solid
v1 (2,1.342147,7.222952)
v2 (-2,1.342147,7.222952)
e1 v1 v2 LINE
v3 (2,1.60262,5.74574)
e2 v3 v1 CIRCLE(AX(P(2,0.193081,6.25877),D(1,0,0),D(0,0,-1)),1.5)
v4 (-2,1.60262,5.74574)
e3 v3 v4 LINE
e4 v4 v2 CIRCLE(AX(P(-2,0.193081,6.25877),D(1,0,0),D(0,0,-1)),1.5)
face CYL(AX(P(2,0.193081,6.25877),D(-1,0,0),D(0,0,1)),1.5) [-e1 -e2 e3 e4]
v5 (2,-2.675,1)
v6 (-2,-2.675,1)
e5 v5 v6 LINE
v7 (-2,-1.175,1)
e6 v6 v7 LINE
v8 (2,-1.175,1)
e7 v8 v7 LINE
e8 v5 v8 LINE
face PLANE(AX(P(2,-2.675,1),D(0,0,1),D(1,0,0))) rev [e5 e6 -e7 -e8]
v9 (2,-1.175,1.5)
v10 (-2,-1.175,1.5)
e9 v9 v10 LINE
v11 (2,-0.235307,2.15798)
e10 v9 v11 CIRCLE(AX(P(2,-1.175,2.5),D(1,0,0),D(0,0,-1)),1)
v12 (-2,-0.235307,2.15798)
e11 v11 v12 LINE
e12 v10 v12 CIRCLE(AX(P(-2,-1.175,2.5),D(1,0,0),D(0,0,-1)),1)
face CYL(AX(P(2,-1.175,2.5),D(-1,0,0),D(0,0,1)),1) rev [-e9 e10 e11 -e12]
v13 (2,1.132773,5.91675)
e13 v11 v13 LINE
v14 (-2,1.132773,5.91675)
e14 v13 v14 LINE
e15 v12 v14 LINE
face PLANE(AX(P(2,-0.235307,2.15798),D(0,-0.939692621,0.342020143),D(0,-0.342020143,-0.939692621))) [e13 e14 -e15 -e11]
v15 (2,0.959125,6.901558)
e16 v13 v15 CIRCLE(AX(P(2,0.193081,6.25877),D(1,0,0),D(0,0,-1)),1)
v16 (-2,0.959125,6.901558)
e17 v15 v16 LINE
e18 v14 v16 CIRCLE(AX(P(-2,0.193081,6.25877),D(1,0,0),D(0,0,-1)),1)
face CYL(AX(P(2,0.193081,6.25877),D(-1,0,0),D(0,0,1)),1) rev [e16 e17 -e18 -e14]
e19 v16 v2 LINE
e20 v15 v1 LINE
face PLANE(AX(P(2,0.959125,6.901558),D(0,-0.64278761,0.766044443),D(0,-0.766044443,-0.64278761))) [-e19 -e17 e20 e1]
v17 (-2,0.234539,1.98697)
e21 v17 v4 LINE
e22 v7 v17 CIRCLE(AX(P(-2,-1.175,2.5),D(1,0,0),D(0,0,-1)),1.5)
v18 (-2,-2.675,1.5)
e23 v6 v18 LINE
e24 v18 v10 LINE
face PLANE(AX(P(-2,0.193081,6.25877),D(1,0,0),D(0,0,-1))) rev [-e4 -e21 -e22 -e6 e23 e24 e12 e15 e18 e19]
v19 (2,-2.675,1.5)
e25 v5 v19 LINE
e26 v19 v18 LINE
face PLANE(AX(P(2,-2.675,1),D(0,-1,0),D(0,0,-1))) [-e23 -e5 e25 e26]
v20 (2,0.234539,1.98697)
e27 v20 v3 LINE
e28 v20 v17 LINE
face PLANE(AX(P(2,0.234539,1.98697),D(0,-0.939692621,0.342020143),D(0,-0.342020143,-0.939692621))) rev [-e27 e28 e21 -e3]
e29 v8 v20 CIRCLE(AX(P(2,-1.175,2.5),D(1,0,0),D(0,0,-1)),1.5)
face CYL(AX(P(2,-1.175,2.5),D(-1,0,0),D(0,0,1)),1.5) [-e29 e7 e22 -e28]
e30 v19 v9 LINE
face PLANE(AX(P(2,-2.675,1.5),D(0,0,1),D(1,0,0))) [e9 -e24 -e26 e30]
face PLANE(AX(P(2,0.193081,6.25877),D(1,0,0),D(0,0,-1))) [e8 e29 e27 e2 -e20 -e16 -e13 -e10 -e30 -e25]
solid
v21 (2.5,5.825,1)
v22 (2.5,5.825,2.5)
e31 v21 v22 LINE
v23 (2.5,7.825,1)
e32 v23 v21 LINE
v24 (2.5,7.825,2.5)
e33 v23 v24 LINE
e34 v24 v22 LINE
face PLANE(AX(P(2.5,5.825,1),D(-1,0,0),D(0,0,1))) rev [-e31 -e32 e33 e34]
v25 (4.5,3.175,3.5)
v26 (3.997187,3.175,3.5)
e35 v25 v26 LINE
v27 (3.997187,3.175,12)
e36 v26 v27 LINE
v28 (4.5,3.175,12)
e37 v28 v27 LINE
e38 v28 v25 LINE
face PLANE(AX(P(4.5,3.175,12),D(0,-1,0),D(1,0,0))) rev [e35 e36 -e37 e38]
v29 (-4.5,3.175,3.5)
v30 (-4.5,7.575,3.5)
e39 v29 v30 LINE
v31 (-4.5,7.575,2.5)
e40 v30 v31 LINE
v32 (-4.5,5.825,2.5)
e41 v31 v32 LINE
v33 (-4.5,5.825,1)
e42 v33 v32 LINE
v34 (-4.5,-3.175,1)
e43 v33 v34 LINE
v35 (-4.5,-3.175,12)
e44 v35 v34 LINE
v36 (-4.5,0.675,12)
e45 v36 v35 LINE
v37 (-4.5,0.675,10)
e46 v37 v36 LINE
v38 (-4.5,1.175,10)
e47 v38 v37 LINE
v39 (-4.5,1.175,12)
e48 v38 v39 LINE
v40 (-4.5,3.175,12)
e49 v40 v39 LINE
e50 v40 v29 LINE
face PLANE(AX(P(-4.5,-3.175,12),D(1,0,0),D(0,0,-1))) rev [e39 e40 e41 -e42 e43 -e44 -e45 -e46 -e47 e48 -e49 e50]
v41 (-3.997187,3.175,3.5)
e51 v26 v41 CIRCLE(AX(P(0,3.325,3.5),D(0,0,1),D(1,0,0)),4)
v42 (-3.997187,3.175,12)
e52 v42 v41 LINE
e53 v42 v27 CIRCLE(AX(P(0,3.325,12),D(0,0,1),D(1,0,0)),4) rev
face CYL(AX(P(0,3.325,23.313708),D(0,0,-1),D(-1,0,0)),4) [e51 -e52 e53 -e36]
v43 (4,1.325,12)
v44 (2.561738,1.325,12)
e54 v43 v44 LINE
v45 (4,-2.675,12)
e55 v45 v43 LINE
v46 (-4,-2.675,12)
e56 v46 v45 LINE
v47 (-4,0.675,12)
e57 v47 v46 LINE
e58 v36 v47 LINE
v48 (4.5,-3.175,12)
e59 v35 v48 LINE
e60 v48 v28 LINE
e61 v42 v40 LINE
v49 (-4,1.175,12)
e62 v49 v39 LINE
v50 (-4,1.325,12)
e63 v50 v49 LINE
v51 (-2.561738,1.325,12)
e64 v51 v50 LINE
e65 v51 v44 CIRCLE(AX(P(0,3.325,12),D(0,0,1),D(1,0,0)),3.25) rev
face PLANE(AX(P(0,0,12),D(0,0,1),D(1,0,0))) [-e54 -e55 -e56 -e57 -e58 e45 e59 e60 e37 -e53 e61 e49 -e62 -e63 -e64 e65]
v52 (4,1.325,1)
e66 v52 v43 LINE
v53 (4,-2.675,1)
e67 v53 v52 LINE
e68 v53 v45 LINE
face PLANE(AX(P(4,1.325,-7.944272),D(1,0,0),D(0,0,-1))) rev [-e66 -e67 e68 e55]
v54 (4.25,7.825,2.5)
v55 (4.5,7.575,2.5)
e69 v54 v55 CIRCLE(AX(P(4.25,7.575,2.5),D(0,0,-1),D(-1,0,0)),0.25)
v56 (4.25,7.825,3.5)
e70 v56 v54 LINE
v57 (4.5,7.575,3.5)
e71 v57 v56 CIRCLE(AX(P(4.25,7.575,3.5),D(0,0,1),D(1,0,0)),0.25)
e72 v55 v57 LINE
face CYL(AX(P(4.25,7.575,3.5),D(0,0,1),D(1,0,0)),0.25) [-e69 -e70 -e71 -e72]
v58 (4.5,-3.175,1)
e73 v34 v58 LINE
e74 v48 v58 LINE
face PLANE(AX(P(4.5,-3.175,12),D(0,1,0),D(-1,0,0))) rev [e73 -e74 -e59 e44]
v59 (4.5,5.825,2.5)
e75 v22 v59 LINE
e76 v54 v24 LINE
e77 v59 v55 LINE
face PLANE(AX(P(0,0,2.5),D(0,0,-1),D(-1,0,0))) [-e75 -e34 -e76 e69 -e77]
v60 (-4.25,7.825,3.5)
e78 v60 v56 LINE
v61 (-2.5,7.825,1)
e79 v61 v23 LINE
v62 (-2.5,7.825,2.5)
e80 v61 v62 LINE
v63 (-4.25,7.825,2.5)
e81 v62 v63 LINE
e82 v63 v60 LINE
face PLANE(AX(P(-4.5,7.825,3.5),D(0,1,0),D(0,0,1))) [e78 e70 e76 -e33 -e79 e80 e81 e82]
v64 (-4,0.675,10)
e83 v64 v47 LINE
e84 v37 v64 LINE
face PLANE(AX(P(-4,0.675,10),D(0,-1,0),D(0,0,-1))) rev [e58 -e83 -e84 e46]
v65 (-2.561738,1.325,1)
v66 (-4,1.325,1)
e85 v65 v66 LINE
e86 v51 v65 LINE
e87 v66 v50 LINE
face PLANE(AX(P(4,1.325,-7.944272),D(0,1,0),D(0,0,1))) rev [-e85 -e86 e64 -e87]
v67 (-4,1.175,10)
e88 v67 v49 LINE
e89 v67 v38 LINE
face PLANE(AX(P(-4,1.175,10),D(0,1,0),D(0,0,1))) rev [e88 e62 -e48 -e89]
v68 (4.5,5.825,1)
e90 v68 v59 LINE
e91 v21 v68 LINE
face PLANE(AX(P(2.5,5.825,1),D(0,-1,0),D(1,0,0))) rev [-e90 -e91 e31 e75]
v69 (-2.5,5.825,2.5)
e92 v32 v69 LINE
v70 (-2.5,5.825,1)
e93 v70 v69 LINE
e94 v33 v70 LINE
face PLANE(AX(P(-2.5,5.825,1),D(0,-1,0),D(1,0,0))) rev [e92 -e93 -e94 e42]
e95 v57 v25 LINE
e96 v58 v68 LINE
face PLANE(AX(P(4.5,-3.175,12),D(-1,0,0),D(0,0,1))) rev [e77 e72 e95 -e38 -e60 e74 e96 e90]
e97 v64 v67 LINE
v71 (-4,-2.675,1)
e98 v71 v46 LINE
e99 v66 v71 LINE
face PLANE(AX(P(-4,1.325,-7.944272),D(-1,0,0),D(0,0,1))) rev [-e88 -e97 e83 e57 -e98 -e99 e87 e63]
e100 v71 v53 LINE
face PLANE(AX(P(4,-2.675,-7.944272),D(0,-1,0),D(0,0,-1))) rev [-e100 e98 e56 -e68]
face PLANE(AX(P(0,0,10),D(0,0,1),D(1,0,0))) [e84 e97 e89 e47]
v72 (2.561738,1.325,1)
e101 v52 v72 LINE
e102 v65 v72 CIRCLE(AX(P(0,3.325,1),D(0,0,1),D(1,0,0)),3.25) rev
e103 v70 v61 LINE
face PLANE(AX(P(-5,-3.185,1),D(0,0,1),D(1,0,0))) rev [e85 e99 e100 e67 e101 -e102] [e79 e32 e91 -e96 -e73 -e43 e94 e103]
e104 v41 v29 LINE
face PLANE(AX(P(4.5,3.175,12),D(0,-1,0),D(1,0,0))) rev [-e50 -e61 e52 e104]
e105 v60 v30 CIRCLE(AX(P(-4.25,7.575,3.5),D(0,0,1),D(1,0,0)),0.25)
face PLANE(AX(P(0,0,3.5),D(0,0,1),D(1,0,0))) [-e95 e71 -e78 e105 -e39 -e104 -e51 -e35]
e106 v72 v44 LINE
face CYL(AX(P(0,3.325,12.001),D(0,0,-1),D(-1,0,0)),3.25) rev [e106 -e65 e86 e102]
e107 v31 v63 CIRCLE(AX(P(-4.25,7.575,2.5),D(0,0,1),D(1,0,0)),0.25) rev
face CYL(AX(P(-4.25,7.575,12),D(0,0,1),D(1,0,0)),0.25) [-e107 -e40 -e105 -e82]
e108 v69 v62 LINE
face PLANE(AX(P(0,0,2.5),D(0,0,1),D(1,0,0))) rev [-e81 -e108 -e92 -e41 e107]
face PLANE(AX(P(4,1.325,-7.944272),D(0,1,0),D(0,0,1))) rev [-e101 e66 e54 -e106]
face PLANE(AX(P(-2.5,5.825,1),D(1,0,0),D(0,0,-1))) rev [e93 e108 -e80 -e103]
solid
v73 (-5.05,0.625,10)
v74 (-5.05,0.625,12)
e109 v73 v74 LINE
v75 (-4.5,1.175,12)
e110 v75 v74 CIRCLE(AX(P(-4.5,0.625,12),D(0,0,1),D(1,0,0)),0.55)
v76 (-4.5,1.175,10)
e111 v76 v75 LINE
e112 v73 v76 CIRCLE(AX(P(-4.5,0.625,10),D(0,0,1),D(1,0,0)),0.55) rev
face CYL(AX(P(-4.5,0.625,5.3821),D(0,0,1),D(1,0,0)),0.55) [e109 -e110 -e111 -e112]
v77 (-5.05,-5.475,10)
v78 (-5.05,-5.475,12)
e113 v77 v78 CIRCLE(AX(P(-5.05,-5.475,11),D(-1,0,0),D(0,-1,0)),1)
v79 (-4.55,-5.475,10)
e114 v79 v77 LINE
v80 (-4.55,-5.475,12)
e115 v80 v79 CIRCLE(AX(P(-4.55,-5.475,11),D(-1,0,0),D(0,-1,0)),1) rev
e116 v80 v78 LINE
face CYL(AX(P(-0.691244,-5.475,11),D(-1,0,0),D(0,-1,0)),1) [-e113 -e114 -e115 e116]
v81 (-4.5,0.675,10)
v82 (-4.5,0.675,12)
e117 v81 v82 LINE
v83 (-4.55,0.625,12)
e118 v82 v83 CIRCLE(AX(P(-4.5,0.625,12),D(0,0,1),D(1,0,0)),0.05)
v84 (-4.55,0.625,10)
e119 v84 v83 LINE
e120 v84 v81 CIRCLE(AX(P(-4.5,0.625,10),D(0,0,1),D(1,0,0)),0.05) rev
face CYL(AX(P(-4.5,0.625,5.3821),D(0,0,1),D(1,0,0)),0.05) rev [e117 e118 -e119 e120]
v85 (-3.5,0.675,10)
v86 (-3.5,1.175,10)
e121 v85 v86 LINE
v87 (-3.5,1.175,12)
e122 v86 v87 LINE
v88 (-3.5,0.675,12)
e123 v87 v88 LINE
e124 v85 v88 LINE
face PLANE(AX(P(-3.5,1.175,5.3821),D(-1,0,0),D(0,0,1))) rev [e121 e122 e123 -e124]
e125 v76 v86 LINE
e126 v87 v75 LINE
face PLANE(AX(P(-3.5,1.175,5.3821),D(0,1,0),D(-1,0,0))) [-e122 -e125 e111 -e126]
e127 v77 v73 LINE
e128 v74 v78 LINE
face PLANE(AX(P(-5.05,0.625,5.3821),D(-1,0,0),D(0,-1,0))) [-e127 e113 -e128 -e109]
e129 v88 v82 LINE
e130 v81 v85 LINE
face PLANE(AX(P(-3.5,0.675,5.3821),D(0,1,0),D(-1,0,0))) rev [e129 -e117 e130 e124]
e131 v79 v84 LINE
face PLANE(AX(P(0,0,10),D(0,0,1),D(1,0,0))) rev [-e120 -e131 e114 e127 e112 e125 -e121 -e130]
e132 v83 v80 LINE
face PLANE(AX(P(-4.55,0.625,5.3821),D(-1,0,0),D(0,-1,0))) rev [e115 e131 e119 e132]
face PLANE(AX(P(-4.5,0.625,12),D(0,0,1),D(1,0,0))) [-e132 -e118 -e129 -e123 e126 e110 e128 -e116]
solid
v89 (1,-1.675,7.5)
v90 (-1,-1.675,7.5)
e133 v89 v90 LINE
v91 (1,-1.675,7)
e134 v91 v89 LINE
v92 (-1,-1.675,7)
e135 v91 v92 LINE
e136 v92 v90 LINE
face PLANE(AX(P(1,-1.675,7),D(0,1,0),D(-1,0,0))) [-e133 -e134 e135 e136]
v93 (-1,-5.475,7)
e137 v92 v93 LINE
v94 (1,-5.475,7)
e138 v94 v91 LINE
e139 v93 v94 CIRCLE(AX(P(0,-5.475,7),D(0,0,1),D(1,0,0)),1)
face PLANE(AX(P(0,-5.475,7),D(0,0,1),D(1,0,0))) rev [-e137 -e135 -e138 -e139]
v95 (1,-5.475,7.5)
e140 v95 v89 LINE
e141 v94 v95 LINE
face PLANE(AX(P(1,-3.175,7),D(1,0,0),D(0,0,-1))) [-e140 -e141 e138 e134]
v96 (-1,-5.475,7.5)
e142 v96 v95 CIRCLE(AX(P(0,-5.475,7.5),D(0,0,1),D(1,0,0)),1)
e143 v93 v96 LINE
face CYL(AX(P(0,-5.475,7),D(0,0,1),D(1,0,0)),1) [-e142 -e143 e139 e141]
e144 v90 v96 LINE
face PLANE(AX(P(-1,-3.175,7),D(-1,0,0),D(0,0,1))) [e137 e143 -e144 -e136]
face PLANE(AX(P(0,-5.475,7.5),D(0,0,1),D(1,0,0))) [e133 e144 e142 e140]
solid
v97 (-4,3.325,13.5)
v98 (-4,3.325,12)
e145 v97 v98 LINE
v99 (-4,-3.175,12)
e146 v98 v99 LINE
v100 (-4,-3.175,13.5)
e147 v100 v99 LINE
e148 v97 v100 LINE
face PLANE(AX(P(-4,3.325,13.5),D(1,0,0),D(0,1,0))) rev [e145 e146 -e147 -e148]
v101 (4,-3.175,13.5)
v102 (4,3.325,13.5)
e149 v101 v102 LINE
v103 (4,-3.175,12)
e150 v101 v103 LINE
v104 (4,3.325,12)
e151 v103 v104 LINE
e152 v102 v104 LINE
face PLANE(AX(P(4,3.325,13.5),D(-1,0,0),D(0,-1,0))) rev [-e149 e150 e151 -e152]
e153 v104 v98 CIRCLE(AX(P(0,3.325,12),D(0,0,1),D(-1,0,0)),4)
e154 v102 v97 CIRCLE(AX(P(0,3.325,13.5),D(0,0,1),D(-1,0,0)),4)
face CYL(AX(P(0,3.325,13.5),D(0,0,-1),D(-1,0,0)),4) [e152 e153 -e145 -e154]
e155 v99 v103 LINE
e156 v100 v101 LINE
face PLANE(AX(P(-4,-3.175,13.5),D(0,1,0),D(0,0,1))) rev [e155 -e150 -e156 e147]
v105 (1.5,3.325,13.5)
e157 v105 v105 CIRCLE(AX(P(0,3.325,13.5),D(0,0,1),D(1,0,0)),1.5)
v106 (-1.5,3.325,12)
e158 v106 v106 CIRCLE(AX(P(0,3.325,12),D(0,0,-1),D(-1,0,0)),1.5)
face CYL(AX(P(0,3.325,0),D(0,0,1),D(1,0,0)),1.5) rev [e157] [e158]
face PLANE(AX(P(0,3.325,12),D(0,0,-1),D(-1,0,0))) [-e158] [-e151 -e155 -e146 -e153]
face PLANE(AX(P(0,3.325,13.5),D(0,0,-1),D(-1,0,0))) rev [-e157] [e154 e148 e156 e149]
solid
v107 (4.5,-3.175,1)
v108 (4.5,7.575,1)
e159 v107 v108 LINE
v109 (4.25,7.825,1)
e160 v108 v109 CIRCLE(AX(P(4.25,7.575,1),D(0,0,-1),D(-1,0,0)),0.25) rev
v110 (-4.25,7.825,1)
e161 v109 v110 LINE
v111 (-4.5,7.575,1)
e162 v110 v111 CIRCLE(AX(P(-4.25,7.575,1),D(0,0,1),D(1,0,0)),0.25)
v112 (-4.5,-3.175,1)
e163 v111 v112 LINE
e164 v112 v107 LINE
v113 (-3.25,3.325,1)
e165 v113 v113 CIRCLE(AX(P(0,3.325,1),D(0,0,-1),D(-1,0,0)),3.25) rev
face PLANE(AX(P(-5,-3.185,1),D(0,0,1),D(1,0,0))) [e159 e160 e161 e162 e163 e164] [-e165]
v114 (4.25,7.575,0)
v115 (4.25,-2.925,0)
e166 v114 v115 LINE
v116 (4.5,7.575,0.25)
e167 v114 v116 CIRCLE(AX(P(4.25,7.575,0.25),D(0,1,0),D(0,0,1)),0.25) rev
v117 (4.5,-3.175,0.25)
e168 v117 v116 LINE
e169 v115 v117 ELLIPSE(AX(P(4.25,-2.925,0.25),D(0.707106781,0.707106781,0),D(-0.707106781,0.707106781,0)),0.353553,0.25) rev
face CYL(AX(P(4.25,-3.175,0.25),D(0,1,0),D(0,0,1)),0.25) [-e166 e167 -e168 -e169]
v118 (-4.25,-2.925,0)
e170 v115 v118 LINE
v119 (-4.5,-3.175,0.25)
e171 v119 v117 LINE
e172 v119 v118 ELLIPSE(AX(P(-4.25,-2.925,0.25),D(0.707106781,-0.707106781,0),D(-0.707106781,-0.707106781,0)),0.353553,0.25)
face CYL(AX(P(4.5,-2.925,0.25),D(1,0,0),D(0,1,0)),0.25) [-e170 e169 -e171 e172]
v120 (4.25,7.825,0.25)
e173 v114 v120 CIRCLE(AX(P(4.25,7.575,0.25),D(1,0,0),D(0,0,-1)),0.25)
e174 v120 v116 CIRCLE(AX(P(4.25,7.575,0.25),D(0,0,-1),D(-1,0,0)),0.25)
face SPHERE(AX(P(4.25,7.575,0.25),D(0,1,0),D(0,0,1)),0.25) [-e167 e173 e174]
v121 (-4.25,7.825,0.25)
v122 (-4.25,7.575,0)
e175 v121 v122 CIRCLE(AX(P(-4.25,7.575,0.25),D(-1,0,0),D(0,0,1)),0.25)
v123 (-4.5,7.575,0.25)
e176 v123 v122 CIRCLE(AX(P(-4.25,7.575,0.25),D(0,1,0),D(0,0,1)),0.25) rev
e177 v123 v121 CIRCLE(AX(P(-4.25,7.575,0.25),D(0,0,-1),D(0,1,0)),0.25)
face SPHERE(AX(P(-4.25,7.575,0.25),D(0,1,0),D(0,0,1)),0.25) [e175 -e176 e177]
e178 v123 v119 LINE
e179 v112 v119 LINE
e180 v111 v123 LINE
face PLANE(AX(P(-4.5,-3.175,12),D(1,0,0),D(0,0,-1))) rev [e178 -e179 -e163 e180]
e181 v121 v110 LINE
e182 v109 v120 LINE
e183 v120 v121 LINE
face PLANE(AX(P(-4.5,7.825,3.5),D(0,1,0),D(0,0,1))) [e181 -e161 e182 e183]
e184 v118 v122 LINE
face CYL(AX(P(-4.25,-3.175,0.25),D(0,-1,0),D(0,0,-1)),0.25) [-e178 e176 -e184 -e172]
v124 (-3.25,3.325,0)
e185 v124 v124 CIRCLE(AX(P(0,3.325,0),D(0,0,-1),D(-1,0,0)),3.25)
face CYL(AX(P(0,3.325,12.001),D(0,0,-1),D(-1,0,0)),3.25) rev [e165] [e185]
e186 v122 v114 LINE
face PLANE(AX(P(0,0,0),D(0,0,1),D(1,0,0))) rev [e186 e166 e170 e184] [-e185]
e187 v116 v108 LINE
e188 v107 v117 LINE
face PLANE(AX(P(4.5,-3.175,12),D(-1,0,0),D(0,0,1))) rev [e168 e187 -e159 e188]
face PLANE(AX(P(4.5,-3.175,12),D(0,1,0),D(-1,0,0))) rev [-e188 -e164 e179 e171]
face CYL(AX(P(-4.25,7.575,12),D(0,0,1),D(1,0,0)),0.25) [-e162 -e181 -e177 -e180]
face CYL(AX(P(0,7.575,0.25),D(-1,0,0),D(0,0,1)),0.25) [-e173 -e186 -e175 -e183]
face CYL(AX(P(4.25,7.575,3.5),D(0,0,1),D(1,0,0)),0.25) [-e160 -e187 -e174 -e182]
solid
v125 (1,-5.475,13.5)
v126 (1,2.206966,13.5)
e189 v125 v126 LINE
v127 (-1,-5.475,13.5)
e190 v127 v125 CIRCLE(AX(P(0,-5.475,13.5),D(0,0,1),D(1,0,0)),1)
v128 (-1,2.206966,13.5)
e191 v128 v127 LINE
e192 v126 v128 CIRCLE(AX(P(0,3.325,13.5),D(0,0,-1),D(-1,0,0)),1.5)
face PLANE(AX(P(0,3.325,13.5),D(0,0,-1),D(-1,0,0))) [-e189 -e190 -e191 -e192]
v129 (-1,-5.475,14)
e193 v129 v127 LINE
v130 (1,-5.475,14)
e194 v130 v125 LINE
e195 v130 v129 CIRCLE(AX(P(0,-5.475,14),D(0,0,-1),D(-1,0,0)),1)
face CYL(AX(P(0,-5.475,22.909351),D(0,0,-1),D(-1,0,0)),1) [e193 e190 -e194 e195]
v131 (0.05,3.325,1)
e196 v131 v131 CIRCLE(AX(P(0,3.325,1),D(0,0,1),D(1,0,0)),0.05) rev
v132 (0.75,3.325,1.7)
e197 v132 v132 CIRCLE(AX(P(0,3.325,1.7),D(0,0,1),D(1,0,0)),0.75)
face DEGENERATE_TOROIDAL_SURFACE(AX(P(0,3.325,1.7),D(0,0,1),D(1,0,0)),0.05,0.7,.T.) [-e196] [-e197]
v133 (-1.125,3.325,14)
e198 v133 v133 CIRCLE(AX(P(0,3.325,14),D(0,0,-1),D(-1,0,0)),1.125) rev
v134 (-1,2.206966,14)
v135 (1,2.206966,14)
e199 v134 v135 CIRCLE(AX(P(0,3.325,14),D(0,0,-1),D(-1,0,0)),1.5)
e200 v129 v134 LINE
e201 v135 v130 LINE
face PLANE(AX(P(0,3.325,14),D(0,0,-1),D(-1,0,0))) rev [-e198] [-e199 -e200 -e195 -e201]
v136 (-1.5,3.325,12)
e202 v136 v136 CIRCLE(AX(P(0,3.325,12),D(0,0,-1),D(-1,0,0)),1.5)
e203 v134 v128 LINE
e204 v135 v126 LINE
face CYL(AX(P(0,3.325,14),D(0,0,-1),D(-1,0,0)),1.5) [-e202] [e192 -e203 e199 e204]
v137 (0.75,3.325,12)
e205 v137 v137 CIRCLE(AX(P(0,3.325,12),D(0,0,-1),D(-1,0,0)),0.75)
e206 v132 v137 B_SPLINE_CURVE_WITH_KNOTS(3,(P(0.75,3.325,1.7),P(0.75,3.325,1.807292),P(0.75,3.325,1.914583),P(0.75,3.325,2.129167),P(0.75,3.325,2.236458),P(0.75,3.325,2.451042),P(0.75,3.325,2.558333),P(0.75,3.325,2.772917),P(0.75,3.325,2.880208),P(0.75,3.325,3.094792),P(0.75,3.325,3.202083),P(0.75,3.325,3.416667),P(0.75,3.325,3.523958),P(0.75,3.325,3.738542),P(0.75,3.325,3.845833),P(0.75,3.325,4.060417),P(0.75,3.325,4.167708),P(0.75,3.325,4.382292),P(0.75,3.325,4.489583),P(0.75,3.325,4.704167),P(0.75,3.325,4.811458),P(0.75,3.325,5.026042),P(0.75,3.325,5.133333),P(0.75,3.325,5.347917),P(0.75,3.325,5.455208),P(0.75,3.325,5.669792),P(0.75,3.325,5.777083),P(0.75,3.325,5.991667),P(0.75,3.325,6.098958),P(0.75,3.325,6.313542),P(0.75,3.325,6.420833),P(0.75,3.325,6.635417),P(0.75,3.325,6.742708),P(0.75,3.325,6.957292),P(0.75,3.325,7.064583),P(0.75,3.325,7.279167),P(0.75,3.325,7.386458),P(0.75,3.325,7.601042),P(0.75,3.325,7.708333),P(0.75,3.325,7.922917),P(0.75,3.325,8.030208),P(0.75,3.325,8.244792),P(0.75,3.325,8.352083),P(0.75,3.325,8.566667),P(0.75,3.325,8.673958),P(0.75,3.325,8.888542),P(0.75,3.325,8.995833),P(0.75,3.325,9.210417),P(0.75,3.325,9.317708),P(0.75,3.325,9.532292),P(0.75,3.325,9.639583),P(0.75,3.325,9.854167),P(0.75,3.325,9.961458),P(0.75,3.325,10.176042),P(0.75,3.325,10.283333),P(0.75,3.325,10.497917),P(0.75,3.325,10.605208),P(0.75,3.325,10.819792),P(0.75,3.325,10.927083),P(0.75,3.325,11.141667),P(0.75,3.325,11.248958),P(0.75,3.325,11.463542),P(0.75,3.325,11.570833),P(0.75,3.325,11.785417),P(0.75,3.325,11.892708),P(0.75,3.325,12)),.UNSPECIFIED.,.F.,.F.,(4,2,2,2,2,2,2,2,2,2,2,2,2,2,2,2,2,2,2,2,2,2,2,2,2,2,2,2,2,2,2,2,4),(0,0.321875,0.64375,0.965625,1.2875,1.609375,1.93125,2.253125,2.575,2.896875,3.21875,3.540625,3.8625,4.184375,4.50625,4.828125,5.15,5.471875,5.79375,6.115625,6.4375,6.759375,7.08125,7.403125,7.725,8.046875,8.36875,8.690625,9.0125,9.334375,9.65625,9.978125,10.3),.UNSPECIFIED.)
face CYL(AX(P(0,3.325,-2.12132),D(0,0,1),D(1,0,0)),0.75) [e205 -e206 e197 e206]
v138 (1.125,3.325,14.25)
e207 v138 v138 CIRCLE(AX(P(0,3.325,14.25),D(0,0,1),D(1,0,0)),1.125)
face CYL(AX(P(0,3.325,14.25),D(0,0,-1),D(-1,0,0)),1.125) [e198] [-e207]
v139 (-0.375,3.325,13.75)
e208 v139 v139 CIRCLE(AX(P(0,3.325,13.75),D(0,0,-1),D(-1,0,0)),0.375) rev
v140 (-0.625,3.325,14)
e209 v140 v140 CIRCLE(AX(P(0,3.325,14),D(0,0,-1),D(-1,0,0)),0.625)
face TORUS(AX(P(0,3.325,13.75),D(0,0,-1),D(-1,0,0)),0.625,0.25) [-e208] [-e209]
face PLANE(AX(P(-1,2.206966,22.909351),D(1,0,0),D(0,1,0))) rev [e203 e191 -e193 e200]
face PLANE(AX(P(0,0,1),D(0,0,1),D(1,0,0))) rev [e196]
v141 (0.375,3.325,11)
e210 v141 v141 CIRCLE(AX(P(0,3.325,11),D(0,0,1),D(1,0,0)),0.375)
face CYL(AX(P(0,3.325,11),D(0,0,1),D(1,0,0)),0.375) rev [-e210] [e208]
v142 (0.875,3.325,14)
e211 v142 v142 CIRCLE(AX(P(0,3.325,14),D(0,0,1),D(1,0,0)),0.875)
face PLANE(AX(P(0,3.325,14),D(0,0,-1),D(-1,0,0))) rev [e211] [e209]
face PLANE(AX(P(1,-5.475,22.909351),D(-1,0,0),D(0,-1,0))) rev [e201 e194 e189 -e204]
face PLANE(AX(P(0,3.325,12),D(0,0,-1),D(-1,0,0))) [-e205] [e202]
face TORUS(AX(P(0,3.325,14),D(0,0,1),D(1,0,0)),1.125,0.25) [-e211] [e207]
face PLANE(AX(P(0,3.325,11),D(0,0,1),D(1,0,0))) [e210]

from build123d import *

# Parameters (mm, degrees)
SKETCH1_W              = 9
SKETCH1_H              = 6.35
BOSS_EXTRUDE1_DEPTH    = 12
SKETCH2_W              = 9
SKETCH2_H              = 11
BOSS_EXTRUDE2_DEPTH    = 3.5
SKETCH4_R              = 4
BOSS_EXTRUDE3_DEPTH    = 12
SKETCH5_W              = 2
SKETCH5_H              = 2
CUT_EXTRUDE1_DEPTH     = 0.75
FILLET1_R              = 0.25
CUT_EXTRUDE2_REACH     = 17.016
SKETCH6_R              = 3.25
SKETCH7_W              = 8
SKETCH7_H              = 4
CUT_EXTRUDE3_DEPTH     = 11
BOSS_EXTRUDE5_DEPTH    = 1.5
SPLIT1_SURFACE_1_BACK  = 20.602
SPLIT1_SURFACE_1_DEPTH = 41.204
SPLIT1_SURFACE_2_BACK  = 20.602
SPLIT1_SURFACE_2_DEPTH = 41.204
SKETCH10_R             = 1.5
CUT_EXTRUDE4_DEPTH     = 17.239785251
SKETCH11_R             = 1.5
BOSS_EXTRUDE6_DEPTH    = 2
SKETCH12_R             = 0.75
BOSS_EXTRUDE7_DEPTH    = 11
FILLET2_R              = 0.7
BOSS_EXTRUDE8_DEPTH    = 0.5
SKETCH14_W             = 0.5
SKETCH14_H             = 0.5
CUT_EXTRUDE5_DEPTH     = 2
EXTRUDE_THIN1_DEPTH    = 2
BOSS_EXTRUDE9_DEPTH    = 0.5
BOSS_EXTRUDE10_DEPTH   = 0.5
EXTRUDE_THIN2_DEPTH    = 2
SKETCH21_R             = 1.125
SKETCH21_R_2           = 0.875
EXTRUDE_THIN3_DEPTH    = 0.25
SKETCH22_R             = 0.375
CUT_EXTRUDE6_DEPTH     = 3
FILLET3_R              = 0.25


with BuildPart() as part:
    # Sketch1 → Boss-Extrude1 (new body)
    with BuildSketch(Plane.XY):
        Rectangle(SKETCH1_W, SKETCH1_H)
    extrude(amount=BOSS_EXTRUDE1_DEPTH)

    # Sketch2 → Boss-Extrude2 (add)
    with BuildSketch(Plane(origin=(0, 0, 0), x_dir=(-1, 0, 0), z_dir=(0, 0, -1))):
        with Locations((0, 2.325)):
            Rectangle(SKETCH2_W, SKETCH2_H)
    extrude(amount=-BOSS_EXTRUDE2_DEPTH)

    # Sketch4 → Boss-Extrude3 (add)
    with BuildSketch(Plane(origin=(0, 0, 0), x_dir=(-1, 0, 0), z_dir=(0, 0, -1))):
        with Locations((0, 3.325)):
            Circle(SKETCH4_R)
    extrude(amount=-BOSS_EXTRUDE3_DEPTH)

    # Sketch5 → Cut-Extrude1 (cut, symmetric)
    with BuildSketch(Plane.XY.offset(1.75)):
        with Locations((-3.5, 6.825)):
            Rectangle(SKETCH5_W, SKETCH5_H)
        with Locations((3.5, 6.825)):
            Rectangle(SKETCH5_W, SKETCH5_H)
    extrude(amount=CUT_EXTRUDE1_DEPTH, both=True, mode=Mode.SUBTRACT)

    # Fillet1
    fillet1_edges = [part.edges().sort_by_distance(p)[0] for p in [
        (0, 7.825, 0),
        (-4.5, 7.825, 3),
        (4.5, 7.825, 3),
        (-4.5, 7.825, 0.5),
        (4.5, 7.825, 0.5),
        (4.5, 2.325, 0),
        (0, -3.175, 0),
        (-4.5, 2.325, 0),
    ]]
    fillet(fillet1_edges, radius=FILLET1_R)

    # Sketch6 → Cut-Extrude2 (cut, up to next)
    with BuildSketch(Plane(origin=(0, 0, 0), x_dir=(-1, 0, 0), z_dir=(0, 0, -1)), mode=Mode.PRIVATE) as cut_extrude2_sk1:
        with Locations((0, 3.325)):
            Circle(SKETCH6_R)
    cut_extrude2_tool1 = extrude(cut_extrude2_sk1.sketch, amount=-CUT_EXTRUDE2_REACH, mode=Mode.PRIVATE) & part.part
    add(cut_extrude2_tool1.solids().sort_by_distance((0, 3.325, 0))[0], mode=Mode.SUBTRACT)

    # Sketch7 → Cut-Extrude3 (cut)
    with BuildSketch(Plane.XY.offset(12)):
        with Locations((0, -0.675)):
            Rectangle(SKETCH7_W, SKETCH7_H)
    extrude(amount=-CUT_EXTRUDE3_DEPTH, mode=Mode.SUBTRACT)


with BuildPart() as body_2:
    # Sketch8 → Boss-Extrude5 (new body)
    with BuildSketch(Plane.XY.offset(12)):
        with BuildLine():
            Line((-4, 3.325), (-4, -3.175))
            Line((-4, -3.175), (4, -3.175))
            Line((4, -3.175), (4, 3.325))
            ThreePointArc((4, 3.325), (0, 7.325), (-4, 3.325))
        make_face()
    extrude(amount=BOSS_EXTRUDE5_DEPTH)

    # Sketch10 → Cut-Extrude4 (cut, through all)
    with BuildSketch(Plane.XY.offset(13.5)):
        with Locations((0, 3.325)):
            Circle(SKETCH10_R)
    extrude(amount=-CUT_EXTRUDE4_DEPTH, mode=Mode.SUBTRACT)


with BuildPart() as body_3:
    # Split1: the piece behind the surface
    add(part.part)
    # Split1 surface: a surface, the sketch's curves swept straight by 41.204 mm
    with BuildLine(Plane(origin=(0, 7.825, 0), x_dir=(1, 0, 0), z_dir=(0, 1, 0)).offset(-SPLIT1_SURFACE_1_BACK), mode=Mode.PRIVATE) as split1_surface_1_path:
        Line((-5, -1), (5, -1))
    split1_surface_1 = Shell.extrude(split1_surface_1_path.wire(), (0 * SPLIT1_SURFACE_1_DEPTH, 1 * SPLIT1_SURFACE_1_DEPTH, 0 * SPLIT1_SURFACE_1_DEPTH))
    split(bisect_by=split1_surface_1, keep=Keep.BOTTOM)

    # Sketch14 → Cut-Extrude5 (cut)
    with BuildSketch(Plane.XY.offset(12)):
        with Locations((-4.25, 0.925)):
            Rectangle(SKETCH14_W, SKETCH14_H)
    extrude(amount=-CUT_EXTRUDE5_DEPTH, mode=Mode.SUBTRACT)


with BuildPart() as part_1:
    add(part.part)

    # Split1: split by a surface, the side it looks to stays
    # Split1 surface: a surface, the sketch's curves swept straight by 41.204 mm
    with BuildLine(Plane(origin=(0, 7.825, 0), x_dir=(1, 0, 0), z_dir=(0, 1, 0)).offset(-SPLIT1_SURFACE_2_BACK), mode=Mode.PRIVATE) as split1_surface_2_path:
        Line((-5, -1), (5, -1))
    split1_surface_2 = Shell.extrude(split1_surface_2_path.wire(), (0 * SPLIT1_SURFACE_2_DEPTH, 1 * SPLIT1_SURFACE_2_DEPTH, 0 * SPLIT1_SURFACE_2_DEPTH))
    split(bisect_by=split1_surface_2, keep=Keep.TOP)


with BuildPart() as body_4:
    # Sketch11 → Boss-Extrude6 (new body)
    with BuildSketch(Plane(origin=(0, 0, 12), x_dir=(-1, 0, 0), z_dir=(0, 0, -1))):
        with Locations((0, 3.325)):
            Circle(SKETCH11_R)
    extrude(amount=-BOSS_EXTRUDE6_DEPTH)

    # Sketch12 → Boss-Extrude7 (add)
    with BuildSketch(Plane(origin=(0, 0, 12), x_dir=(-1, 0, 0), z_dir=(0, 0, -1))):
        with Locations(Location((0, 3.325, 0), (0, 0, 180))):
            Circle(SKETCH12_R)
    extrude(amount=BOSS_EXTRUDE7_DEPTH)

    # Fillet2
    fillet2_edges = [body_4.edges().sort_by_distance(p)[0] for p in [
        (-0.75, 3.325, 1),
    ]]
    fillet(fillet2_edges, radius=FILLET2_R)

    # Sketch13 → Boss-Extrude8 (add)
    with BuildSketch(Plane.XY.offset(13.5)):
        with BuildLine():
            Line((-1, 2.206966011), (-1, -5.475))
            ThreePointArc((-1, -5.475), (0, -6.475), (1, -5.475))
            Line((1, -5.475), (1, 2.206966011))
            ThreePointArc((1, 2.206966011), (0, 1.825), (-1, 2.206966011))
        make_face()
    extrude(amount=BOSS_EXTRUDE8_DEPTH)

    # Sketch21 → Extrude-Thin3 (add)
    with BuildSketch(Plane.XY.offset(14)):
        with Locations((0, 3.325)):
            Circle(SKETCH21_R)
        with Locations((0, 3.325)):
            Circle(SKETCH21_R_2, mode=Mode.SUBTRACT)
    extrude(amount=EXTRUDE_THIN3_DEPTH)

    # Sketch22 → Cut-Extrude6 (cut)
    with BuildSketch(Plane.XY.offset(14)):
        with Locations((0, 3.325)):
            Circle(SKETCH22_R)
    extrude(amount=-CUT_EXTRUDE6_DEPTH, mode=Mode.SUBTRACT)

    # Fillet3
    fillet3_edges = [body_4.edges().sort_by_distance(p)[0] for p in [
        (-0.875, 3.325, 14.25),
        (-0.375, 3.325, 14),
    ]]
    fillet(fillet3_edges, radius=FILLET3_R - 0.0001)  # a hair under: the kernel refuses the full size


with BuildPart() as body_5:
    # Sketch15 → Extrude-Thin1 (new body)
    with BuildSketch(Plane.XY.offset(12)):
        with BuildLine():
            Line((-3.5, 0.675), (-4.5, 0.675))
            ThreePointArc((-4.5, 0.675), (-4.535355339, 0.660355339), (-4.55, 0.625))
            Line((-4.55, 0.625), (-4.55, -3.175))
            Line((-4.55, -3.175), (-5.05, -3.175))
            Line((-5.05, -3.175), (-5.05, 0.625))
            ThreePointArc((-5.05, 0.625), (-4.88890873, 1.01390873), (-4.5, 1.175))
            Line((-4.5, 1.175), (-3.5, 1.175))
            Line((-3.5, 1.175), (-3.5, 0.675))
        make_face()
    extrude(amount=-EXTRUDE_THIN1_DEPTH)

    # Sketch16 → Boss-Extrude9 (add)
    with BuildSketch(Plane.ZY.offset(5.05)):
        with BuildLine():
            Line((10, -3.175), (10, -5.475))
            ThreePointArc((10, -5.475), (11, -6.475), (12, -5.475))
            Line((12, -5.475), (12, -3.175))
            Line((12, -3.175), (10, -3.175))
        make_face()
    extrude(amount=-BOSS_EXTRUDE9_DEPTH)


with BuildPart() as body_6:
    # Sketch17 → Boss-Extrude10 (new body)
    with BuildSketch(Plane.XY.offset(7.5)):
        with BuildLine():
            Line((-1, -3.175), (-1, -5.475))
            ThreePointArc((-1, -5.475), (0, -6.475), (1, -5.475))
            Line((1, -5.475), (1, -3.175))
            Line((1, -3.175), (1, -1.675))
            Line((1, -1.675), (-1, -1.675))
            Line((-1, -1.675), (-1, -3.175))
        make_face()
    extrude(amount=-BOSS_EXTRUDE10_DEPTH)


with BuildPart() as body_7:
    # Sketch18 → Extrude-Thin2 (new, symmetric)
    with BuildSketch(Plane(origin=(0, 0, 0), x_dir=(0, 0, -1), z_dir=(1, 0, 0))):
        with BuildLine():
            Line((-1, -2.675), (-1, -1.175))
            ThreePointArc((-1, -1.175), (-1.271271934, -0.314635345), (-1.986969785, 0.234538931))
            Line((-1.986969785, 0.234538931), (-5.745740268, 1.602619504))
            ThreePointArc((-5.745740268, 1.602619504), (-6.51924275, 1.670292203), (-7.222951898, 1.342147238))
            Line((-7.222951898, 1.342147238), (-6.901558093, 0.959125016))
            ThreePointArc((-6.901558093, 0.959125016), (-6.432418661, 1.177888326), (-5.91675034, 1.132773194))
            Line((-5.91675034, 1.132773194), (-2.157979857, -0.235307379))
            ThreePointArc((-2.157979857, -0.235307379), (-1.680847956, -0.601423564), (-1.5, -1.175))
            Line((-1.5, -1.175), (-1.5, -2.675))
            Line((-1.5, -2.675), (-1, -2.675))
        make_face()
    extrude(amount=EXTRUDE_THIN2_DEPTH, both=True)


solid = Compound([body_2.part, body_3.part, part_1.part, body_4.part, body_5.part, body_6.part, body_7.part])
